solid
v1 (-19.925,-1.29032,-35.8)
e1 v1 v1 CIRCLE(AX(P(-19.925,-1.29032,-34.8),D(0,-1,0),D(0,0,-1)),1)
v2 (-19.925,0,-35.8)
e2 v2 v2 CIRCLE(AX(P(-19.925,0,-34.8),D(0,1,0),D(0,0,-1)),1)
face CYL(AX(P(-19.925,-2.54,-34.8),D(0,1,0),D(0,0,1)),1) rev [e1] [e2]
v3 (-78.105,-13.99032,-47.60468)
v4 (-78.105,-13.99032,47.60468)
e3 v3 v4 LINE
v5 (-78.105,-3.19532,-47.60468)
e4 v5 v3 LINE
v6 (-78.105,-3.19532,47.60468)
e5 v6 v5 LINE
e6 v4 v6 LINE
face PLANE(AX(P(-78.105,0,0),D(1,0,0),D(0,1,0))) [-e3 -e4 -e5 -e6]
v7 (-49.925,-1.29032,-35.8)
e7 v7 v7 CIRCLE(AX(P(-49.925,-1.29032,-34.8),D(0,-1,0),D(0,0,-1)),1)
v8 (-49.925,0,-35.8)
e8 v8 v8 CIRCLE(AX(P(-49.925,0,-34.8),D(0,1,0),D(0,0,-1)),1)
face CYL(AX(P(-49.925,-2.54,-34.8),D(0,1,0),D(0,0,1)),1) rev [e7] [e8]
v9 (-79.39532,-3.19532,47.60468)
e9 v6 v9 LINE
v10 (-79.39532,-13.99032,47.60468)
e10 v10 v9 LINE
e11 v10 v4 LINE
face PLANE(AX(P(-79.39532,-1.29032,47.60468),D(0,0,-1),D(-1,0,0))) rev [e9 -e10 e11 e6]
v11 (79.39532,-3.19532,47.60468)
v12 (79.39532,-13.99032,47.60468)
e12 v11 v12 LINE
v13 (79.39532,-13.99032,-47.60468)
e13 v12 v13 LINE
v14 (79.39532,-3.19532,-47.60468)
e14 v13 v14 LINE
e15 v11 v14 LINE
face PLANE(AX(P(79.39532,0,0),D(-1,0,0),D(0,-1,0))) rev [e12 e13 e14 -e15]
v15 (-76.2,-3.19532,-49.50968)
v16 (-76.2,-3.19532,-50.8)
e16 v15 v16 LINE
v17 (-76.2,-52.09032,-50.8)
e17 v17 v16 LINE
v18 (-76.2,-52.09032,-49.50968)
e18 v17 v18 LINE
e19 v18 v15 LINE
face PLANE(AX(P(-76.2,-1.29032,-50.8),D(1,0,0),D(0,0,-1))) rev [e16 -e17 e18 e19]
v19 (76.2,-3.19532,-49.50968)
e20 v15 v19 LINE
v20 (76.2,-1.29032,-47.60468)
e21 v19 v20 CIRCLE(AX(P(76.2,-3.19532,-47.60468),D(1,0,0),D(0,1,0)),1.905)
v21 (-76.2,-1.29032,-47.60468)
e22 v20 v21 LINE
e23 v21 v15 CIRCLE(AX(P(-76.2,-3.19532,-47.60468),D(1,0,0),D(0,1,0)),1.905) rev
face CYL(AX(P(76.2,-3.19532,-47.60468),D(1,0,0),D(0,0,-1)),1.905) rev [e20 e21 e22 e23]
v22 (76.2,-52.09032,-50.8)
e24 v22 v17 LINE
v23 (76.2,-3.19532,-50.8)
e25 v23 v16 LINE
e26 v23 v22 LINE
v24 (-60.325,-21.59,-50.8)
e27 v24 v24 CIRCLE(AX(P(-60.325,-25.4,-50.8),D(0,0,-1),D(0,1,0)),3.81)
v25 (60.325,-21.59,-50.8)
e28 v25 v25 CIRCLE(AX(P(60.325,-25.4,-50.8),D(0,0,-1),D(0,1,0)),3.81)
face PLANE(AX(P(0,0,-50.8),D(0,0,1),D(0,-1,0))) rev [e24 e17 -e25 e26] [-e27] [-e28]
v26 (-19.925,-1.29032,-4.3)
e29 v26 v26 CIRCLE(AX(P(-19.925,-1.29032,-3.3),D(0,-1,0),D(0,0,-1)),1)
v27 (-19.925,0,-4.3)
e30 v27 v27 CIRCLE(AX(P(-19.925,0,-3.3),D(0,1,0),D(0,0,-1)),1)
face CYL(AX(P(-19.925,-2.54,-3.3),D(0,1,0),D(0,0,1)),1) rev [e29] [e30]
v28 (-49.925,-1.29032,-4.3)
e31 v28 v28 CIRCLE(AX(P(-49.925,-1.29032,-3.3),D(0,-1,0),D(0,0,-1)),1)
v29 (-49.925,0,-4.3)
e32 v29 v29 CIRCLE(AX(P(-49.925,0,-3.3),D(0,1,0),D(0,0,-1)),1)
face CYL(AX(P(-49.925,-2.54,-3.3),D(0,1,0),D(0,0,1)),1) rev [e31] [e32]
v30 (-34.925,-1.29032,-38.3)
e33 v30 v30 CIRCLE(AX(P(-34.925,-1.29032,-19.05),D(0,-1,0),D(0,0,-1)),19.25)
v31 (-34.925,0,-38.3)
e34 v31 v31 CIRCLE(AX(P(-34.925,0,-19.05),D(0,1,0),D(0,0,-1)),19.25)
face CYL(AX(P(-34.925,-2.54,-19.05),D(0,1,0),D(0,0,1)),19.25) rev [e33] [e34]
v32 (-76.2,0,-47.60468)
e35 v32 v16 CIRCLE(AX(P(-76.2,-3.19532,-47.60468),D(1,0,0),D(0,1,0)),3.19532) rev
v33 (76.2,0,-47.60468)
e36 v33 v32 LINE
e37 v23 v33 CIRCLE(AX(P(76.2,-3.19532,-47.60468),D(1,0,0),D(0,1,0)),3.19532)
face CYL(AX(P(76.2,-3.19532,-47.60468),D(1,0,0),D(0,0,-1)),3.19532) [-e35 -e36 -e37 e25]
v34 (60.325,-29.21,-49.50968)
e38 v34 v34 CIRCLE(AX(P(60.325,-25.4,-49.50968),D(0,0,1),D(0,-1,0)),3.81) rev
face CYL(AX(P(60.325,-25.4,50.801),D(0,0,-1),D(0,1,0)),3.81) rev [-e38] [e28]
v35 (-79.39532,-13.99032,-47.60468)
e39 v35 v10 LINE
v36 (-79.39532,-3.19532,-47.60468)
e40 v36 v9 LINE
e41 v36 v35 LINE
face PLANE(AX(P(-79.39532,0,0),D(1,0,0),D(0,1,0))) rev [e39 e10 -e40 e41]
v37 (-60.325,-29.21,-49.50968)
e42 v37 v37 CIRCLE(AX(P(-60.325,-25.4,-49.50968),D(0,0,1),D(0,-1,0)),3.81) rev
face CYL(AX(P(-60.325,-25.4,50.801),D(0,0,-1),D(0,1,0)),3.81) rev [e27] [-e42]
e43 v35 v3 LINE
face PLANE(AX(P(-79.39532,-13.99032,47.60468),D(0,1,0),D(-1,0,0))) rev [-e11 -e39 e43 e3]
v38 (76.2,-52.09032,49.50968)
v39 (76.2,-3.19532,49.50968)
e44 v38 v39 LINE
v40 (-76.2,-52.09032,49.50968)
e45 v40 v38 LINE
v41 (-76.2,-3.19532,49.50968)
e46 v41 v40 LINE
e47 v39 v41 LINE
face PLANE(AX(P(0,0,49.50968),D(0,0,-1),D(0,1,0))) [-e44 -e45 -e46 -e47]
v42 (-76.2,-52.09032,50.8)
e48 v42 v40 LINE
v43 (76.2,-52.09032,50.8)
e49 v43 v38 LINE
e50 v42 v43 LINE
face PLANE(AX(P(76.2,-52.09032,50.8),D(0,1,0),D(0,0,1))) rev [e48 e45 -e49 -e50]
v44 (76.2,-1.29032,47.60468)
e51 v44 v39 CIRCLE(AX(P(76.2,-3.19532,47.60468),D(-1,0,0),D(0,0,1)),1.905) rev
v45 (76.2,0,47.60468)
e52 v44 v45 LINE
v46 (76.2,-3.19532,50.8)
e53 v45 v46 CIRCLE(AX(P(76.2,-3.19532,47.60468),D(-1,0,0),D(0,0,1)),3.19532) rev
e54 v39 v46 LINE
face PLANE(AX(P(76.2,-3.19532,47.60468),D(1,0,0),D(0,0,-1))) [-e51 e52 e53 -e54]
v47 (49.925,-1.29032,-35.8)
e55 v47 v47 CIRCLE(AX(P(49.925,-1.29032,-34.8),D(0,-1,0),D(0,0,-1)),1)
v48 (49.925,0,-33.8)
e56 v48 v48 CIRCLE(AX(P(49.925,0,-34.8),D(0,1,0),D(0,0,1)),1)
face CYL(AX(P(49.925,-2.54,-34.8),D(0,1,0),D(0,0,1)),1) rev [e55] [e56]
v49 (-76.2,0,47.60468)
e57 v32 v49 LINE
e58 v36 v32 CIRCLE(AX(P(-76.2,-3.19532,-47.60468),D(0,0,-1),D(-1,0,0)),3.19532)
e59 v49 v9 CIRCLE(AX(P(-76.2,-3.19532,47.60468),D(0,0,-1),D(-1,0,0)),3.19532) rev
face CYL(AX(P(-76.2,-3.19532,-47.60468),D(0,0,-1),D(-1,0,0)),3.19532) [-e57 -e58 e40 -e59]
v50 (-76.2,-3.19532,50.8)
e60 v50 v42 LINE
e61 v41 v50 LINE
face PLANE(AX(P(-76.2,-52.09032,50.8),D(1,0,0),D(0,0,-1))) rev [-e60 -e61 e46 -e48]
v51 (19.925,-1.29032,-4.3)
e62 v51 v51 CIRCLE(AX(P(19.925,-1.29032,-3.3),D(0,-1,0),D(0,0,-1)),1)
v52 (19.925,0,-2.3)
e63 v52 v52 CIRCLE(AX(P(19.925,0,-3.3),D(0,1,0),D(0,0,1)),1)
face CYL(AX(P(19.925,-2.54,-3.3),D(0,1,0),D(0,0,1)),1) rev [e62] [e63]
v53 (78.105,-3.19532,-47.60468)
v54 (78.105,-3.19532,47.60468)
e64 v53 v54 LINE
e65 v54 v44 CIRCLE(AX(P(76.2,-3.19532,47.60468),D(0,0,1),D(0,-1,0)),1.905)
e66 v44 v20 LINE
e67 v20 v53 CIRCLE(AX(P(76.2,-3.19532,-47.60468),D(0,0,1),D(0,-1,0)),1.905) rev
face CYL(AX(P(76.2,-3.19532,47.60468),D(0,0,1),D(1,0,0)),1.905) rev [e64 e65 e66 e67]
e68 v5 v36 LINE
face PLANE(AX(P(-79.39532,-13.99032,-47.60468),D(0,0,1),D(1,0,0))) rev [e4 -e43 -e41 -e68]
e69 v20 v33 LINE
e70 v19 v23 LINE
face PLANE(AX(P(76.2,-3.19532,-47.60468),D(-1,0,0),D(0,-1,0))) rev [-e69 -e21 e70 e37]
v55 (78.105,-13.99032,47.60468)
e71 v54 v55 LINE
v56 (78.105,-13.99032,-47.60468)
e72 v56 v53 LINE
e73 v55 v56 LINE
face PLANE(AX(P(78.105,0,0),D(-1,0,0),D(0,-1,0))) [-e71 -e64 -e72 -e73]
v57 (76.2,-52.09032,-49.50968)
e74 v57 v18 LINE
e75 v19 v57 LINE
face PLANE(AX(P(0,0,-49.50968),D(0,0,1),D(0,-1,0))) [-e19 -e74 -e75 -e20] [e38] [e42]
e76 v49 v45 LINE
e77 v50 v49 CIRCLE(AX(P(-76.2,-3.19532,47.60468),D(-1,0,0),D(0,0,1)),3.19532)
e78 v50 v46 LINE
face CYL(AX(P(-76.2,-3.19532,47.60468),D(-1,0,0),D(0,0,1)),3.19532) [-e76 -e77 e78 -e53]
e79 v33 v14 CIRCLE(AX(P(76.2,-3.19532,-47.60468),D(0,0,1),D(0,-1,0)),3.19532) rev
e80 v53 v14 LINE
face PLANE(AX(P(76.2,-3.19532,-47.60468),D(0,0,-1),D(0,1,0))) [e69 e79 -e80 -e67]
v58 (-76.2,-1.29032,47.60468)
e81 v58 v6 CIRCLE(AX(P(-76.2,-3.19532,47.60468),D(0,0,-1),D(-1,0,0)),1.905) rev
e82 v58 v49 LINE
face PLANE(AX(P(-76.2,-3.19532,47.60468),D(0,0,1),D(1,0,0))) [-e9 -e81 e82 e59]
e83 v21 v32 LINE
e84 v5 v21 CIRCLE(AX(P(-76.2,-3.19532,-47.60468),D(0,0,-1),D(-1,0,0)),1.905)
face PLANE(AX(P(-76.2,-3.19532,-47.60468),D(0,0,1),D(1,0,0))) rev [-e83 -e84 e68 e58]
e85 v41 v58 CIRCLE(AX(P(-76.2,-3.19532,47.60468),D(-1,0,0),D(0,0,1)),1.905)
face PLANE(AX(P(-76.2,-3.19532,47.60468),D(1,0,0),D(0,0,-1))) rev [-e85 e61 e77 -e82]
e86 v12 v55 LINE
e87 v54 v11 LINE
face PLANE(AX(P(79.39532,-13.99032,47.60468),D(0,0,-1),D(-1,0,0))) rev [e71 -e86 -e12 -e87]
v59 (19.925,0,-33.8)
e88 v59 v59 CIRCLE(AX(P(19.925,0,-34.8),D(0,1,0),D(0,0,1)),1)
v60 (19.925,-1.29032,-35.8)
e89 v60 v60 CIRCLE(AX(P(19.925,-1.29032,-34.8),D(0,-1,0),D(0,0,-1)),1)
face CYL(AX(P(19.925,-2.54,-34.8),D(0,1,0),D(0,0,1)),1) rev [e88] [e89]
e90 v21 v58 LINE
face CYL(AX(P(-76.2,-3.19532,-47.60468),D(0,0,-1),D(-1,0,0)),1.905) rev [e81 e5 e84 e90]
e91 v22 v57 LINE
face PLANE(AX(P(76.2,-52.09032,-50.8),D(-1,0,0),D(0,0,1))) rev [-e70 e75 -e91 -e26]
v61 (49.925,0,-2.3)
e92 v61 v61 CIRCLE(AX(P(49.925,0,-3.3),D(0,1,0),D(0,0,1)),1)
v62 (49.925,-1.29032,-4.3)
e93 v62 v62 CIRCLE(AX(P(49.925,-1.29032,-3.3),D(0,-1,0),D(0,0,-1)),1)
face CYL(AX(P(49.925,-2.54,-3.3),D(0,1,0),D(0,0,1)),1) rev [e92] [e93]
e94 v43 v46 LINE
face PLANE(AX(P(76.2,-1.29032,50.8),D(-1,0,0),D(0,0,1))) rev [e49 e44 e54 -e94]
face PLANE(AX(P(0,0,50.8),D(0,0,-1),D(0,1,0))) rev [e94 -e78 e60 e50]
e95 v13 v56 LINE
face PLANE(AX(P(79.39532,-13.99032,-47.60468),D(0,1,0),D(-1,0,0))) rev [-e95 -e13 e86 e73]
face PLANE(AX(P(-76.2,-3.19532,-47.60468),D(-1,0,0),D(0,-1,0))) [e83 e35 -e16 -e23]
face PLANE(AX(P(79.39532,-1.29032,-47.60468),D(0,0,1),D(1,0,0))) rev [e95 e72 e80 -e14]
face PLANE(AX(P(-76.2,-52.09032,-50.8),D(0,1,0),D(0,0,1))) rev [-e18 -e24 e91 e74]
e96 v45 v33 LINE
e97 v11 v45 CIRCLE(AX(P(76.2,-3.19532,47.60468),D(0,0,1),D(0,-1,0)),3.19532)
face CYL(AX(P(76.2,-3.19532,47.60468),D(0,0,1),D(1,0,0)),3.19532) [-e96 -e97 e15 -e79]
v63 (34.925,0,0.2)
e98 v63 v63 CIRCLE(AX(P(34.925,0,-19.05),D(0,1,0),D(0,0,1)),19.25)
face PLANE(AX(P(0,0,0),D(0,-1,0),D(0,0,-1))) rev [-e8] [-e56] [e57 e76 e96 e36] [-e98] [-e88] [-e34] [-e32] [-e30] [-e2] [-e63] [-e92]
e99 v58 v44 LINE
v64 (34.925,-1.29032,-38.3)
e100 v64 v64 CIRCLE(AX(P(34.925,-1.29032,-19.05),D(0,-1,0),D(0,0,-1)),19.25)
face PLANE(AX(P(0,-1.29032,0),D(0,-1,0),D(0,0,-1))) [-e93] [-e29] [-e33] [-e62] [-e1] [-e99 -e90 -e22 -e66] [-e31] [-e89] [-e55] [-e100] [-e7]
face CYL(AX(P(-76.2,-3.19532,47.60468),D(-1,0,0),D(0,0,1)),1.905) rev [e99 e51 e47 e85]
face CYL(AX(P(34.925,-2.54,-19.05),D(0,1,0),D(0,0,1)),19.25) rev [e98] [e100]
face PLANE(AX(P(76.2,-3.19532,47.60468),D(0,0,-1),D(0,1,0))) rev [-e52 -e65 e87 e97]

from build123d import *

# Parameters (mm, degrees)
SKETCH1_W                      = 152.4
SKETCH1_H                      = 101.6
BASE_FLANGE1_DEPTH             = 1.29032
EDGE_FLANGE1_STRIP_W           = 8.97128
EDGE_FLANGE1_STRIP_H           = 1.29032
EDGE_FLANGE1_STRIP_CUT_DEPTH   = 152.4
EDGE_FLANGE1_STRIP_2_W         = 8.97128
EDGE_FLANGE1_STRIP_2_H         = 1.29032
EDGE_FLANGE1_STRIP_CUT_2_DEPTH = 152.4
EDGE_FLANGE1_DEPTH             = 152.4
EDGE_FLANGE1_BEND_DEPTH        = 152.4
EDGE_FLANGE2_DEPTH             = 95.20936
EDGE_FLANGE2_BEND_DEPTH        = 95.20936
SKETCH22_R                     = 19.249999981
SKETCH22_R_2                   = 1
CUT_EXTRUDE1_DEPTH             = 2.54
CUT_EXTRUDE2_REACH             = 141.067
SKETCH23_R                     = 3.81


# Sheet-metal steps are written as plain solids
with BuildPart() as part:
    # Sketch1 → Base-Flange1 (new body)
    with BuildSketch(Plane(origin=(0, 0, 0), x_dir=(1, 0, 0), z_dir=(0, 1, 0))):
        Rectangle(SKETCH1_W, SKETCH1_H)
    extrude(amount=-BASE_FLANGE1_DEPTH)

    # Edge-Flange1 strip (across the edge) → Edge-Flange1 strip cut (cut)
    with BuildSketch(Plane(origin=(76.2, -1.29032, 50.8), x_dir=(0, 0, -1), z_dir=(-1, 0, 0))):
        with Locations((-1.29032, -0.64516)):
            Rectangle(EDGE_FLANGE1_STRIP_W, EDGE_FLANGE1_STRIP_H)
    extrude(amount=EDGE_FLANGE1_STRIP_CUT_DEPTH, mode=Mode.SUBTRACT)

    # Edge-Flange1 strip 2 (across the edge) → Edge-Flange1 strip cut 2 (cut)
    with BuildSketch(Plane(origin=(-76.2, -1.29032, -50.8), x_dir=(0, 0, 1), z_dir=(1, 0, 0))):
        with Locations((-1.29032, -0.64516)):
            Rectangle(EDGE_FLANGE1_STRIP_2_W, EDGE_FLANGE1_STRIP_2_H)
    extrude(amount=EDGE_FLANGE1_STRIP_CUT_2_DEPTH, mode=Mode.SUBTRACT)

    # Edge-Flange1 section (across the edge) → Edge-Flange1 (add)
    with BuildSketch(Plane(origin=(76.2, -1.29032, 50.8), x_dir=(0, 0, -1), z_dir=(-1, 0, 0))):
        with BuildLine():
            Line((0, 1.905), (0, 50.8))
            Line((0, 50.8), (1.29032, 50.8))
            Line((1.29032, 50.8), (1.29032, 1.905))
            ThreePointArc((1.29032, 1.905), (1.848281582, 0.557961582), (3.19532, 0))
            Line((3.19532, 0), (3.19532, -1.29032))
            ThreePointArc((3.19532, -1.29032), (0.93588756, -0.35443244), (0, 1.905))
        make_face()
    extrude(amount=EDGE_FLANGE1_DEPTH)

    # Edge-Flange1 section 2 (across the edge) → Edge-Flange1 bend (add)
    with BuildSketch(Plane(origin=(-76.2, -1.29032, -50.8), x_dir=(0, 0, 1), z_dir=(1, 0, 0))):
        with BuildLine():
            Line((0, 1.905), (0, 50.8))
            Line((0, 50.8), (1.29032, 50.8))
            Line((1.29032, 50.8), (1.29032, 1.905))
            ThreePointArc((1.29032, 1.905), (1.848281582, 0.557961582), (3.19532, 0))
            Line((3.19532, 0), (3.19532, -1.29032))
            ThreePointArc((3.19532, -1.29032), (0.93588756, -0.35443244), (0, 1.905))
        make_face()
    extrude(amount=EDGE_FLANGE1_BEND_DEPTH)

    # Edge-Flange2 section (across the edge) → Edge-Flange2 (add)
    with BuildSketch(Plane(origin=(-78.105, -1.29032, 47.60468), x_dir=(1, 0, 0), z_dir=(0, 0, -1))):
        with BuildLine():
            Line((-1.29032, 1.905), (-1.29032, 12.7))
            Line((-1.29032, 12.7), (0, 12.7))
            Line((0, 12.7), (0, 1.905))
            ThreePointArc((0, 1.905), (0.557961582, 0.557961582), (1.905, 0))
            Line((1.905, 0), (1.905, -1.29032))
            ThreePointArc((1.905, -1.29032), (-0.35443244, -0.35443244), (-1.29032, 1.905))
        make_face()
    extrude(amount=EDGE_FLANGE2_DEPTH)

    # Edge-Flange2 section 2 (across the edge) → Edge-Flange2 bend (add)
    with BuildSketch(Plane(origin=(78.105, -1.29032, -47.60468), x_dir=(-1, 0, 0), z_dir=(0, 0, 1))):
        with BuildLine():
            Line((-1.29032, 1.905), (-1.29032, 12.7))
            Line((-1.29032, 12.7), (0, 12.7))
            Line((0, 12.7), (0, 1.905))
            ThreePointArc((0, 1.905), (0.557961582, 0.557961582), (1.905, 0))
            Line((1.905, 0), (1.905, -1.29032))
            ThreePointArc((1.905, -1.29032), (-0.35443244, -0.35443244), (-1.29032, 1.905))
        make_face()
    extrude(amount=EDGE_FLANGE2_BEND_DEPTH)

    # Sketch22 → Cut-Extrude1 (cut)
    with BuildSketch(Plane(origin=(0, 0, 0), x_dir=(1, 0, 0), z_dir=(0, 1, 0))):
        with Locations(Location((34.925, 19.05, 0), (0, 0, 270))):
            Circle(SKETCH22_R)
        with Locations(Location((19.925, 34.8, 0), (0, 0, 270))):
            Circle(SKETCH22_R_2)
        with Locations(Location((49.925, 34.8, 0), (0, 0, 270))):
            Circle(SKETCH22_R_2)
        with Locations(Location((49.925, 3.3, 0), (0, 0, 270))):
            Circle(SKETCH22_R_2)
        with Locations(Location((19.925, 3.3, 0), (0, 0, 270))):
            Circle(SKETCH22_R_2)
        with Locations(Location((-19.925, 3.3, 0), (0, 0, 90))):
            Circle(SKETCH22_R_2)
        with Locations(Location((-49.925, 3.3, 0), (0, 0, 90))):
            Circle(SKETCH22_R_2)
        with Locations(Location((-49.925, 34.8, 0), (0, 0, 90))):
            Circle(SKETCH22_R_2)
        with Locations(Location((-19.925, 34.8, 0), (0, 0, 90))):
            Circle(SKETCH22_R_2)
        with Locations(Location((-34.925, 19.05, 0), (0, 0, 90))):
            Circle(SKETCH22_R)
    extrude(amount=-CUT_EXTRUDE1_DEPTH, mode=Mode.SUBTRACT)

    # Sketch23 → Cut-Extrude2 (cut, up to next)
    with BuildSketch(Plane(origin=(0, 0, -50.8), x_dir=(-1, 0, 0), z_dir=(0, 0, -1)), mode=Mode.PRIVATE) as cut_extrude2_sk1:
        with Locations(Location((60.325, -25.4, 0), (0, 0, 90))):
            Circle(SKETCH23_R)
    cut_extrude2_tool1 = extrude(cut_extrude2_sk1.sketch, amount=-CUT_EXTRUDE2_REACH, mode=Mode.PRIVATE) & part.part
    # Sketch23 → Cut-Extrude2 (cut, up to next)
    with BuildSketch(Plane(origin=(0, 0, -50.8), x_dir=(-1, 0, 0), z_dir=(0, 0, -1)), mode=Mode.PRIVATE) as cut_extrude2_sk2:
        with Locations(Location((-60.325, -25.4, 0), (0, 0, 90))):
            Circle(SKETCH23_R)
    cut_extrude2_tool2 = extrude(cut_extrude2_sk2.sketch, amount=-CUT_EXTRUDE2_REACH, mode=Mode.PRIVATE) & part.part
    add(cut_extrude2_tool1.solids().sort_by_distance((-60.325, -25.4, -50.8))[0], mode=Mode.SUBTRACT)
    add(cut_extrude2_tool2.solids().sort_by_distance((60.325, -25.4, -50.8))[0], mode=Mode.SUBTRACT)


solid = part.part
